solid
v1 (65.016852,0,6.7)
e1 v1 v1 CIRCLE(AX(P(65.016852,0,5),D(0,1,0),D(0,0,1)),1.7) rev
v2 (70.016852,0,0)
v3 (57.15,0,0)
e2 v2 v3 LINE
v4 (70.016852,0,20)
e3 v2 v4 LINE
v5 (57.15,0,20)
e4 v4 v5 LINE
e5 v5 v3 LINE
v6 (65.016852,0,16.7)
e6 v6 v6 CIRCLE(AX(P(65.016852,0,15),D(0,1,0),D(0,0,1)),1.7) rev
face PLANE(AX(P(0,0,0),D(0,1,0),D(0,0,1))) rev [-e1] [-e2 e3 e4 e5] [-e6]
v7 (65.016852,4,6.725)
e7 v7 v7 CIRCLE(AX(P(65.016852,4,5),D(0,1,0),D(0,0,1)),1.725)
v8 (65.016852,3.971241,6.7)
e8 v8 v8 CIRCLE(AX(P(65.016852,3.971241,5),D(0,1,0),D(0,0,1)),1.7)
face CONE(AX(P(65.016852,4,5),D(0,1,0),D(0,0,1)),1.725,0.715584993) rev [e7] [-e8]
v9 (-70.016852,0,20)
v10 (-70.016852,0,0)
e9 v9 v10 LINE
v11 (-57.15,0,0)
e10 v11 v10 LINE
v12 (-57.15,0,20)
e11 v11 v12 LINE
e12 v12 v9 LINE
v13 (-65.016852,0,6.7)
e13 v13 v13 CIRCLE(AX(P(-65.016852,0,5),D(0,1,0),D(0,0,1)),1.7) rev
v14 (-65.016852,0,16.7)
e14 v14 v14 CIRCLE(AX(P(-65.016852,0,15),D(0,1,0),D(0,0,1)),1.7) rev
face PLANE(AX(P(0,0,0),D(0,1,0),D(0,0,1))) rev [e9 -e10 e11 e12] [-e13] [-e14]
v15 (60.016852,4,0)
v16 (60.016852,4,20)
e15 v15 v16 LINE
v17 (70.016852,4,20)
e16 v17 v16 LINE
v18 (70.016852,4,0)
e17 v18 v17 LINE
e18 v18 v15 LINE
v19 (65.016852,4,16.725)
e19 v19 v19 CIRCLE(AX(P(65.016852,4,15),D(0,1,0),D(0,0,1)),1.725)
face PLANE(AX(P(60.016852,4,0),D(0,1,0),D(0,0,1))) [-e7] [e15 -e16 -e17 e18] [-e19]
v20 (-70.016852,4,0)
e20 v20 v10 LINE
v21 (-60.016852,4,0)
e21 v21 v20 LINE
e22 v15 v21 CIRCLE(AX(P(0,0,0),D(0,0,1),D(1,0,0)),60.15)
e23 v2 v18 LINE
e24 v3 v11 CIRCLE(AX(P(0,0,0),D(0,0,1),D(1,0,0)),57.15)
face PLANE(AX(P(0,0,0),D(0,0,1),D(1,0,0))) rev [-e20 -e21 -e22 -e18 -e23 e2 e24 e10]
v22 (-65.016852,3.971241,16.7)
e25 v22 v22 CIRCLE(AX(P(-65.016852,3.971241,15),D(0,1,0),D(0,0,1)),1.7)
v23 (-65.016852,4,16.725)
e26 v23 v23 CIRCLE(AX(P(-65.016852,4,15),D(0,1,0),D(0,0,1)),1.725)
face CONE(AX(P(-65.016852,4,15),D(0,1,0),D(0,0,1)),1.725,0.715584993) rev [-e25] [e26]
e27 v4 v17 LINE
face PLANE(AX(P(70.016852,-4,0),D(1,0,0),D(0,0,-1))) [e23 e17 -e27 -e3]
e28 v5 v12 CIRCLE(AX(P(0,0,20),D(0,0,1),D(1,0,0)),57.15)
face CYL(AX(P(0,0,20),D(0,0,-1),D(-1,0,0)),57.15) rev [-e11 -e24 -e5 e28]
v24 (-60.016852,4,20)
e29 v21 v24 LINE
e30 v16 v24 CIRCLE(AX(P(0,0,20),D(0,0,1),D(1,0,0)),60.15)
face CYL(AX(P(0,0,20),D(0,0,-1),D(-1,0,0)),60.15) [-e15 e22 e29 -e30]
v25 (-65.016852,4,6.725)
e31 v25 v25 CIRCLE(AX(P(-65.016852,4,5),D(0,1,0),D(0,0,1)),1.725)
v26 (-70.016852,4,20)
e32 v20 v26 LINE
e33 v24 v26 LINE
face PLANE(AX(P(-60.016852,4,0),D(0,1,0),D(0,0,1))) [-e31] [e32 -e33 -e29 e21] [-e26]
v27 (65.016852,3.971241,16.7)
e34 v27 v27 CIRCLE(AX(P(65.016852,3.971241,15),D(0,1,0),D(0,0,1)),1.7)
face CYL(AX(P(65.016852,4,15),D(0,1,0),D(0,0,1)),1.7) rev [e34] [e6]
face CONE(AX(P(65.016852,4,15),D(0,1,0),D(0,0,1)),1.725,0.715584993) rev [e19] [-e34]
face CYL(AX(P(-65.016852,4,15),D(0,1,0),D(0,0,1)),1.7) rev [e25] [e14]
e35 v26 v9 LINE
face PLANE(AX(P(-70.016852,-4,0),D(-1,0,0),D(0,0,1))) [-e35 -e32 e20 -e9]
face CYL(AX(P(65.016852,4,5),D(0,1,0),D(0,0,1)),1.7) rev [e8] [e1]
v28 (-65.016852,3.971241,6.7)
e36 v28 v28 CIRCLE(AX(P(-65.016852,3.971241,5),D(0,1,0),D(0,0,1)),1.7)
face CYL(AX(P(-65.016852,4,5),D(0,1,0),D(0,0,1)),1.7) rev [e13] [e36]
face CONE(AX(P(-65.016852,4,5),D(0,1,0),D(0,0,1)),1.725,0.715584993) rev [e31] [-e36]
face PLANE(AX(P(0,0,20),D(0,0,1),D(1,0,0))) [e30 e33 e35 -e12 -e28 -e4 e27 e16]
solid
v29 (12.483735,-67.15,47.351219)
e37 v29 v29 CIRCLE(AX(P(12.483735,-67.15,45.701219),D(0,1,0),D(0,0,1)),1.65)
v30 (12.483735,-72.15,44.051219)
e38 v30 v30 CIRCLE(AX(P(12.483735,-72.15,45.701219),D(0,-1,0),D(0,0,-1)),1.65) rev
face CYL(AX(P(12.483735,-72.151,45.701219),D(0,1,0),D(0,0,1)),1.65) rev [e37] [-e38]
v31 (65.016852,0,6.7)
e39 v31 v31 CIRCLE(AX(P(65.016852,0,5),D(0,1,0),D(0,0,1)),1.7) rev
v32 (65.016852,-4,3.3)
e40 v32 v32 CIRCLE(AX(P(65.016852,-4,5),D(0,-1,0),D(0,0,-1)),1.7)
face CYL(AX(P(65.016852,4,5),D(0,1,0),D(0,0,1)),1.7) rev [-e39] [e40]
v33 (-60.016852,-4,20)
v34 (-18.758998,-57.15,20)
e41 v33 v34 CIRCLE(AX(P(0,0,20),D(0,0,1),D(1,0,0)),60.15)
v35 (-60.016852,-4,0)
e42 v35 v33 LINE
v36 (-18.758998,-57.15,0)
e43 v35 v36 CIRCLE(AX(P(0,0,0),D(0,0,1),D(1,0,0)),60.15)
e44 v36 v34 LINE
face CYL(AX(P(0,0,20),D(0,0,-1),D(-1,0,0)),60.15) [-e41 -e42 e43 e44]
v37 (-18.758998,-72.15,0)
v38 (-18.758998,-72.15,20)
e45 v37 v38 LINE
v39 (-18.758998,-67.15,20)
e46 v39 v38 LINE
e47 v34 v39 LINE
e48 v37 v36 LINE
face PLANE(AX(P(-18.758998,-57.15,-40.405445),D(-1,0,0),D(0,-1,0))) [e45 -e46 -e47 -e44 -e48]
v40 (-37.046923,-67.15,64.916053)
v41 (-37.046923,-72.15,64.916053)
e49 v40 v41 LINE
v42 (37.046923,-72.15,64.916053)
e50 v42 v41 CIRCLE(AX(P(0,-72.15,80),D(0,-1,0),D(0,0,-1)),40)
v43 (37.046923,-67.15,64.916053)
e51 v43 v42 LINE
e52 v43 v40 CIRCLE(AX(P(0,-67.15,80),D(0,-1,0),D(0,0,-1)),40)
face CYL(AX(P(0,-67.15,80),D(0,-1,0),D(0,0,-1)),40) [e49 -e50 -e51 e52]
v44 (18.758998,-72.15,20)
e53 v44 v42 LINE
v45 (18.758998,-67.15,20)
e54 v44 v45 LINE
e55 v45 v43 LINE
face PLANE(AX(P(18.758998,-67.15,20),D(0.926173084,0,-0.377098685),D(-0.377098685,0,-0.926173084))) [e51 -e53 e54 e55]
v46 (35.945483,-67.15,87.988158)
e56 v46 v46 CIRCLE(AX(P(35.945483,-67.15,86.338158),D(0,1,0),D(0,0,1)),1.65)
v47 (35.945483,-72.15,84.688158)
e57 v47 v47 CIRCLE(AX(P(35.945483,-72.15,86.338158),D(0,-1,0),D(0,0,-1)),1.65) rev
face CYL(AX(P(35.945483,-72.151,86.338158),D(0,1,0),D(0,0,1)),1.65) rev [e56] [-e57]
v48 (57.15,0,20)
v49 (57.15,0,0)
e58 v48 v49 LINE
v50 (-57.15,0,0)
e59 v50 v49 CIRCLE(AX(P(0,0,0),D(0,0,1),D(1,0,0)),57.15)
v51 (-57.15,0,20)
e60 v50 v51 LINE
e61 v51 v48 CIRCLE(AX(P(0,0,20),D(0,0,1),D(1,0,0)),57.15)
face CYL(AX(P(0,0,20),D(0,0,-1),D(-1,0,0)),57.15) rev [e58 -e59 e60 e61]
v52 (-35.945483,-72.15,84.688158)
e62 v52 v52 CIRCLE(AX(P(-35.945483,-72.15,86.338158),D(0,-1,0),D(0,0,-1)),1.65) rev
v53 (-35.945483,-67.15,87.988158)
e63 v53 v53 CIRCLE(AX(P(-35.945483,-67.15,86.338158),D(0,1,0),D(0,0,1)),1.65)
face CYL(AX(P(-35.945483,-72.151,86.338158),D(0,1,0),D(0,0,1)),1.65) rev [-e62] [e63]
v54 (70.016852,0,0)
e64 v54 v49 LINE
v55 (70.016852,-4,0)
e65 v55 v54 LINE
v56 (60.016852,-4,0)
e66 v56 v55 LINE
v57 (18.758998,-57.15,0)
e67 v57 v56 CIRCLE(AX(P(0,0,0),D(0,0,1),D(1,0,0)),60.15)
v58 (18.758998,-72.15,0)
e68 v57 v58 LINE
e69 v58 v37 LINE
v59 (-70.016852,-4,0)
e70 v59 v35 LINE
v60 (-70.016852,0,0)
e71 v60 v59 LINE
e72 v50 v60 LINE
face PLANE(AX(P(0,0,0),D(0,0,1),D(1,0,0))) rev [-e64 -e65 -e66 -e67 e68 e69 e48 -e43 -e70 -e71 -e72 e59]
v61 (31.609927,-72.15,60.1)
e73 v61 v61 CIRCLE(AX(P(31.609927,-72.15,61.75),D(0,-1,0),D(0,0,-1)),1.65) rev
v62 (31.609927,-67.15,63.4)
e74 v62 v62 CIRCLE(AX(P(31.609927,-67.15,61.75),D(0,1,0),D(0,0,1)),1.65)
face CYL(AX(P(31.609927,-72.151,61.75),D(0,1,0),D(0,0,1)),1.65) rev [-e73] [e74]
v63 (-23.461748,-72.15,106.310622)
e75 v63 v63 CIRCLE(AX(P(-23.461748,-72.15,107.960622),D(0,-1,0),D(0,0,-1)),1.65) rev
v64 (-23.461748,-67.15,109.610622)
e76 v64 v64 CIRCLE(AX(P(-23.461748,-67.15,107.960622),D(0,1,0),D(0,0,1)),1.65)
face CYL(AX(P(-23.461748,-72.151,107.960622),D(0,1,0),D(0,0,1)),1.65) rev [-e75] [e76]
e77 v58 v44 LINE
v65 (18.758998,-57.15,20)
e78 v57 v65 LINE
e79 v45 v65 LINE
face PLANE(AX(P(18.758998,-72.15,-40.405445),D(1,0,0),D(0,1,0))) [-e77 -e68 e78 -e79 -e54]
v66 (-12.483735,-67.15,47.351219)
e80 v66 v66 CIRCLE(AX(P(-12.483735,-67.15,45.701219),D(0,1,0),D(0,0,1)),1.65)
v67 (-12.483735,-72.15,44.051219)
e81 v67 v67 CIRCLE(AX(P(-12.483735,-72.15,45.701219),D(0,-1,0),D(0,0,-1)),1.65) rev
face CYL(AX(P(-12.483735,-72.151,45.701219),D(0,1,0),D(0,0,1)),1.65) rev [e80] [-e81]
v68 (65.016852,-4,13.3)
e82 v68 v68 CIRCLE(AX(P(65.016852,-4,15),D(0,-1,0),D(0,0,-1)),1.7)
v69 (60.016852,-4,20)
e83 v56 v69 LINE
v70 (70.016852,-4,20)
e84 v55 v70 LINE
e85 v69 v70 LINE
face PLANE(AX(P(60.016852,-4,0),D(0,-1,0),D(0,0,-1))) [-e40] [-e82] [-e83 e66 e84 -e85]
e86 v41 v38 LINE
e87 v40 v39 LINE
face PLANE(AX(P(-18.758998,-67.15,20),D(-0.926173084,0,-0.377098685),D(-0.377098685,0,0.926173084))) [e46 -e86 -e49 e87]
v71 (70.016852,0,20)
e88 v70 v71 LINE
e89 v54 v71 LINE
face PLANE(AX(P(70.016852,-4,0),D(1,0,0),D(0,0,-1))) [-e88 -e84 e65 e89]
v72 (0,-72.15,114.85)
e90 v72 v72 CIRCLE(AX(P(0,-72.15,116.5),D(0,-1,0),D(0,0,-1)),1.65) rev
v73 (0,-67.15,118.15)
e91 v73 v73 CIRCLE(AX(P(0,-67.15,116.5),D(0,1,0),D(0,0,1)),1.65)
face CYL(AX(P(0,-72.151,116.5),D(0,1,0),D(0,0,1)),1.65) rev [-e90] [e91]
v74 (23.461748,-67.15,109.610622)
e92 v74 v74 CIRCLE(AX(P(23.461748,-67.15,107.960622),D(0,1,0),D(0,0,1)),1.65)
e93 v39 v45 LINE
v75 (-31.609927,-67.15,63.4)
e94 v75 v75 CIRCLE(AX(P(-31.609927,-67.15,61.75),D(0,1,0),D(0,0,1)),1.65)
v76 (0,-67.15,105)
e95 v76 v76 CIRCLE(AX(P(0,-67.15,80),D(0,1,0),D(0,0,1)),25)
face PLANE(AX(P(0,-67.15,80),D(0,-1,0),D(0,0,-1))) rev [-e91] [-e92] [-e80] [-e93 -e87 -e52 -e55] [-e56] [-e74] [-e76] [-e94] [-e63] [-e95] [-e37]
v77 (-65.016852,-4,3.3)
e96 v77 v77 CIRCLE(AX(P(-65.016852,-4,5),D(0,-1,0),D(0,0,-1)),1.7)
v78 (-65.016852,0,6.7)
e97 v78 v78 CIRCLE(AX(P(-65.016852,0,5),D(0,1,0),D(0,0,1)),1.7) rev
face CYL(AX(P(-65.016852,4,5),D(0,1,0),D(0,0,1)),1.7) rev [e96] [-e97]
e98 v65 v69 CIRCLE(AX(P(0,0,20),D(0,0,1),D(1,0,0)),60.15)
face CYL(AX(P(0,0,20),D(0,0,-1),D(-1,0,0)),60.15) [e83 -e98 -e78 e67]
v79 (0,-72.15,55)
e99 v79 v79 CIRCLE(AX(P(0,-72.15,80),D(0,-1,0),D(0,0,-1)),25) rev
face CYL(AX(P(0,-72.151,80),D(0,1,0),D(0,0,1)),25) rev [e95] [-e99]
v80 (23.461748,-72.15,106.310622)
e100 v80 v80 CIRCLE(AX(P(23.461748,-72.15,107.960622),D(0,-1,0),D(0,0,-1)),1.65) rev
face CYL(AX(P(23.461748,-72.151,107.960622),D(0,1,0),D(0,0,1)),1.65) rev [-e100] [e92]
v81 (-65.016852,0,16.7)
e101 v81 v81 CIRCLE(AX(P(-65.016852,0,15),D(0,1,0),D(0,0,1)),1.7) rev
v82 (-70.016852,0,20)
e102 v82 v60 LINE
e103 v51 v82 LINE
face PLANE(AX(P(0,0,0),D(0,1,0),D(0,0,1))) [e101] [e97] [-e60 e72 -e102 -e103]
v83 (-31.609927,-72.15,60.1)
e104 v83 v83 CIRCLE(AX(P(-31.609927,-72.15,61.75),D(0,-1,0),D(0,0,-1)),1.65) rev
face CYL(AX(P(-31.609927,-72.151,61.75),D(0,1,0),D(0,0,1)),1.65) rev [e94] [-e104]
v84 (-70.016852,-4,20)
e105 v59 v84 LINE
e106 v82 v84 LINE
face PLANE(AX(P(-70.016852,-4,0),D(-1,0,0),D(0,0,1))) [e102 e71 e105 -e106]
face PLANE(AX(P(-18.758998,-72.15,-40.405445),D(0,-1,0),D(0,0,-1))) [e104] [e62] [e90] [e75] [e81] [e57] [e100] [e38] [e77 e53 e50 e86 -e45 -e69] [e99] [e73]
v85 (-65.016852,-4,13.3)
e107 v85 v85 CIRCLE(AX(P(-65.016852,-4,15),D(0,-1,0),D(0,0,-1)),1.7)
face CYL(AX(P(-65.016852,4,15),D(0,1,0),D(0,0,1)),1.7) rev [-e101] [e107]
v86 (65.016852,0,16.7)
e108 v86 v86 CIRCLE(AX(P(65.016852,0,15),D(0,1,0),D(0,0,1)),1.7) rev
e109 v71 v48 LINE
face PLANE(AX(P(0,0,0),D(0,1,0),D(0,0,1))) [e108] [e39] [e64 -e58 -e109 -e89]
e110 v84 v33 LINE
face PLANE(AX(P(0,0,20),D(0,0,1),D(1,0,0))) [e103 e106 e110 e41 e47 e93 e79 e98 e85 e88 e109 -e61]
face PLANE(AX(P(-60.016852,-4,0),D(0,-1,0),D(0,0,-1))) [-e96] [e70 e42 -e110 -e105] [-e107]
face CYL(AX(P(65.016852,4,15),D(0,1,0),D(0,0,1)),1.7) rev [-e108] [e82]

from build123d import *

# Parameters (mm, degrees)
SKETCH_1_R          = 60.15
SKETCH_1_R_2        = 57.15
EXTRUDE_1_DEPTH     = 20
SKETCH_2_W          = 10
SKETCH_2_H          = 8
EXTRUDE_2_DEPTH     = 20
SKETCH_6_W          = 37.517995682
SKETCH_6_H          = 15
EXTRUDE_3_DEPTH     = 20
EXTRUDE_4_DEPTH     = 5
CUT_EXTRUDE_1_REACH = 190.435
SKETCH_8_R          = 25
CUT_EXTRUDE_2_REACH = 190.435
SKETCH_9_R          = 1.65


# Read off the part's stored shape, not the designer's step: M3 すきま穴1
with BuildPart() as part:
    # ｽｹｯﾁ1 → ﾎﾞｽ - 押し出し1 (new body)
    with BuildSketch(Plane.XY):
        Circle(SKETCH_1_R)
        Circle(SKETCH_1_R_2, mode=Mode.SUBTRACT)
    extrude(amount=EXTRUDE_1_DEPTH)

    # ｽｹｯﾁ2 → ﾎﾞｽ - 押し出し2 (add)
    with BuildSketch(Plane.XY.offset(20)):
        with Locations((65.0168518, 0)):
            Rectangle(SKETCH_2_W, SKETCH_2_H)
        with Locations((-65.0168518, 0)):
            Rectangle(SKETCH_2_W, SKETCH_2_H)
    extrude(amount=-EXTRUDE_2_DEPTH)

    # M3 すきま穴1 outline → M3 すきま穴1 (revolve, cut)
    with BuildSketch(Plane(origin=(65.0168518, 0, 15), x_dir=(1, 0, 0), z_dir=(0, 0, 1))):
        Polygon((0, -4), (1.7, -4), (1.7, 3.97124079), (1.725, 4), (0, 4), align=None)
    revolve(axis=Axis((65.0168518, 0, 15), (0, 1, 0)), mode=Mode.SUBTRACT)

    # Hole Wizard M3 _1 2 outline → Hole Wizard M3 _1 2 (revolve, cut)
    with BuildSketch(Plane(origin=(65.0168518, 0, 5), x_dir=(1, 0, 0), z_dir=(0, 0, 1))):
        Polygon((0, -4), (1.7, -4), (1.7, 3.97124079), (1.725, 4), (0, 4), align=None)
    revolve(axis=Axis((65.0168518, 0, 5), (0, 1, 0)), mode=Mode.SUBTRACT)

    # Hole Wizard M3 _1 3 outline → Hole Wizard M3 _1 3 (revolve, cut)
    with BuildSketch(Plane(origin=(-65.0168518, 0, 15), x_dir=(1, 0, 0), z_dir=(0, 0, 1))):
        Polygon((0, -4), (1.7, -4), (1.7, 3.97124079), (1.725, 4), (0, 4), align=None)
    revolve(axis=Axis((-65.0168518, 0, 15), (0, 1, 0)), mode=Mode.SUBTRACT)

    # Hole Wizard M3 _1 4 outline → Hole Wizard M3 _1 4 (revolve, cut)
    with BuildSketch(Plane(origin=(-65.0168518, 0, 5), x_dir=(1, 0, 0), z_dir=(0, 0, 1))):
        Polygon((0, -4), (1.7, -4), (1.7, 3.97124079), (1.725, 4), (0, 4), align=None)
    revolve(axis=Axis((-65.0168518, 0, 5), (0, 1, 0)), mode=Mode.SUBTRACT)

    # ｽｹｯﾁ6 → ﾎﾞｽ - 押し出し3 (add)
    with BuildSketch(Plane.XY.offset(20)):
        with Locations((0, -64.65)):
            Rectangle(SKETCH_6_W, SKETCH_6_H)
    extrude(amount=-EXTRUDE_3_DEPTH)

    # ｽｹｯﾁ7 → ﾎﾞｽ - 押し出し4 (add)
    with BuildSketch(Plane.XZ.offset(72.15)):
        with BuildLine():
            Line((-18.758997841, 20), (-37.046923361, 64.916052589))
            ThreePointArc((-37.046923361, 64.916052589), (0, 120), (37.046923361, 64.916052589))
            Line((37.046923361, 64.916052589), (18.758997841, 20))
            Line((18.758997841, 20), (-18.758997841, 20))
        make_face()
    extrude(amount=-EXTRUDE_4_DEPTH)

    # ｽｹｯﾁ8 → ｶｯﾄ - 押し出し1 (cut, up to next)
    with BuildSketch(Plane(origin=(0, -67.15, 0), x_dir=(1, 0, 0), z_dir=(0, 1, 0)), mode=Mode.PRIVATE) as cut_extrude_1_sk1:
        with Locations(Location((0, -80, 0), (0, 0, 270))):
            Circle(SKETCH_8_R)
    cut_extrude_1_tool1 = extrude(cut_extrude_1_sk1.sketch, amount=-CUT_EXTRUDE_1_REACH, mode=Mode.PRIVATE) & part.part
    add(cut_extrude_1_tool1.solids().sort_by_distance((0, -67.15, 80))[0], mode=Mode.SUBTRACT)

    # ｽｹｯﾁ9 → ｶｯﾄ - 押し出し2 (cut, up to next)
    with BuildSketch(Plane(origin=(0, -67.15, 0), x_dir=(1, 0, 0), z_dir=(0, 1, 0)), mode=Mode.PRIVATE) as cut_extrude_2_sk1:
        with Locations(Location((0, -116.5, 0), (0, 0, 270))):
            Circle(SKETCH_9_R)
    cut_extrude_2_tool1 = extrude(cut_extrude_2_sk1.sketch, amount=-CUT_EXTRUDE_2_REACH, mode=Mode.PRIVATE) & part.part
    # ｽｹｯﾁ9 → ｶｯﾄ - 押し出し2 (cut, up to next)
    with BuildSketch(Plane(origin=(0, -67.15, 0), x_dir=(1, 0, 0), z_dir=(0, 1, 0)), mode=Mode.PRIVATE) as cut_extrude_2_sk2:
        with Locations(Location((-23.461747754, -107.960622174, 0), (0, 0, 270))):
            Circle(SKETCH_9_R)
    cut_extrude_2_tool2 = extrude(cut_extrude_2_sk2.sketch, amount=-CUT_EXTRUDE_2_REACH, mode=Mode.PRIVATE) & part.part
    # ｽｹｯﾁ9 → ｶｯﾄ - 押し出し2 (cut, up to next)
    with BuildSketch(Plane(origin=(0, -67.15, 0), x_dir=(1, 0, 0), z_dir=(0, 1, 0)), mode=Mode.PRIVATE) as cut_extrude_2_sk3:
        with Locations(Location((-35.945482985, -86.338158485, 0), (0, 0, 270))):
            Circle(SKETCH_9_R)
    cut_extrude_2_tool3 = extrude(cut_extrude_2_sk3.sketch, amount=-CUT_EXTRUDE_2_REACH, mode=Mode.PRIVATE) & part.part
    # ｽｹｯﾁ9 → ｶｯﾄ - 押し出し2 (cut, up to next)
    with BuildSketch(Plane(origin=(0, -67.15, 0), x_dir=(1, 0, 0), z_dir=(0, 1, 0)), mode=Mode.PRIVATE) as cut_extrude_2_sk4:
        with Locations(Location((-31.609927238, -61.75, 0), (0, 0, 270))):
            Circle(SKETCH_9_R)
    cut_extrude_2_tool4 = extrude(cut_extrude_2_sk4.sketch, amount=-CUT_EXTRUDE_2_REACH, mode=Mode.PRIVATE) & part.part
    # ｽｹｯﾁ9 → ｶｯﾄ - 押し出し2 (cut, up to next)
    with BuildSketch(Plane(origin=(0, -67.15, 0), x_dir=(1, 0, 0), z_dir=(0, 1, 0)), mode=Mode.PRIVATE) as cut_extrude_2_sk5:
        with Locations(Location((-12.483735231, -45.701219341, 0), (0, 0, 270))):
            Circle(SKETCH_9_R)
    cut_extrude_2_tool5 = extrude(cut_extrude_2_sk5.sketch, amount=-CUT_EXTRUDE_2_REACH, mode=Mode.PRIVATE) & part.part
    # ｽｹｯﾁ9 → ｶｯﾄ - 押し出し2 (cut, up to next)
    with BuildSketch(Plane(origin=(0, -67.15, 0), x_dir=(1, 0, 0), z_dir=(0, 1, 0)), mode=Mode.PRIVATE) as cut_extrude_2_sk6:
        with Locations(Location((12.483735231, -45.701219341, 0), (0, 0, 270))):
            Circle(SKETCH_9_R)
    cut_extrude_2_tool6 = extrude(cut_extrude_2_sk6.sketch, amount=-CUT_EXTRUDE_2_REACH, mode=Mode.PRIVATE) & part.part
    # ｽｹｯﾁ9 → ｶｯﾄ - 押し出し2 (cut, up to next)
    with BuildSketch(Plane(origin=(0, -67.15, 0), x_dir=(1, 0, 0), z_dir=(0, 1, 0)), mode=Mode.PRIVATE) as cut_extrude_2_sk7:
        with Locations(Location((31.609927238, -61.75, 0), (0, 0, 270))):
            Circle(SKETCH_9_R)
    cut_extrude_2_tool7 = extrude(cut_extrude_2_sk7.sketch, amount=-CUT_EXTRUDE_2_REACH, mode=Mode.PRIVATE) & part.part
    # ｽｹｯﾁ9 → ｶｯﾄ - 押し出し2 (cut, up to next)
    with BuildSketch(Plane(origin=(0, -67.15, 0), x_dir=(1, 0, 0), z_dir=(0, 1, 0)), mode=Mode.PRIVATE) as cut_extrude_2_sk8:
        with Locations(Location((35.945482985, -86.338158485, 0), (0, 0, 270))):
            Circle(SKETCH_9_R)
    cut_extrude_2_tool8 = extrude(cut_extrude_2_sk8.sketch, amount=-CUT_EXTRUDE_2_REACH, mode=Mode.PRIVATE) & part.part
    # ｽｹｯﾁ9 → ｶｯﾄ - 押し出し2 (cut, up to next)
    with BuildSketch(Plane(origin=(0, -67.15, 0), x_dir=(1, 0, 0), z_dir=(0, 1, 0)), mode=Mode.PRIVATE) as cut_extrude_2_sk9:
        with Locations(Location((23.461747754, -107.960622174, 0), (0, 0, 270))):
            Circle(SKETCH_9_R)
    cut_extrude_2_tool9 = extrude(cut_extrude_2_sk9.sketch, amount=-CUT_EXTRUDE_2_REACH, mode=Mode.PRIVATE) & part.part
    add(cut_extrude_2_tool1.solids().sort_by_distance((0, -67.15, 116.5))[0], mode=Mode.SUBTRACT)
    add(cut_extrude_2_tool2.solids().sort_by_distance((-23.461748, -67.15, 107.960622))[0], mode=Mode.SUBTRACT)
    add(cut_extrude_2_tool3.solids().sort_by_distance((-35.945483, -67.15, 86.338158))[0], mode=Mode.SUBTRACT)
    add(cut_extrude_2_tool4.solids().sort_by_distance((-31.609927, -67.15, 61.75))[0], mode=Mode.SUBTRACT)
    add(cut_extrude_2_tool5.solids().sort_by_distance((-12.483735, -67.15, 45.701219))[0], mode=Mode.SUBTRACT)
    add(cut_extrude_2_tool6.solids().sort_by_distance((12.483735, -67.15, 45.701219))[0], mode=Mode.SUBTRACT)
    add(cut_extrude_2_tool7.solids().sort_by_distance((31.609927, -67.15, 61.75))[0], mode=Mode.SUBTRACT)
    add(cut_extrude_2_tool8.solids().sort_by_distance((35.945483, -67.15, 86.338158))[0], mode=Mode.SUBTRACT)
    add(cut_extrude_2_tool9.solids().sort_by_distance((23.461748, -67.15, 107.960622))[0], mode=Mode.SUBTRACT)


with BuildPart() as body_2:
    # Split Bodies 1: the piece on the far side of the plane
    add(part.part)
    split(bisect_by=Plane.ZX, keep=Keep.BOTTOM)


with BuildPart() as part_1:
    add(part.part)

    # Split Bodies 1
    split(bisect_by=Plane.ZX, keep=Keep.TOP)


solid = Compound([body_2.part, part_1.part])
